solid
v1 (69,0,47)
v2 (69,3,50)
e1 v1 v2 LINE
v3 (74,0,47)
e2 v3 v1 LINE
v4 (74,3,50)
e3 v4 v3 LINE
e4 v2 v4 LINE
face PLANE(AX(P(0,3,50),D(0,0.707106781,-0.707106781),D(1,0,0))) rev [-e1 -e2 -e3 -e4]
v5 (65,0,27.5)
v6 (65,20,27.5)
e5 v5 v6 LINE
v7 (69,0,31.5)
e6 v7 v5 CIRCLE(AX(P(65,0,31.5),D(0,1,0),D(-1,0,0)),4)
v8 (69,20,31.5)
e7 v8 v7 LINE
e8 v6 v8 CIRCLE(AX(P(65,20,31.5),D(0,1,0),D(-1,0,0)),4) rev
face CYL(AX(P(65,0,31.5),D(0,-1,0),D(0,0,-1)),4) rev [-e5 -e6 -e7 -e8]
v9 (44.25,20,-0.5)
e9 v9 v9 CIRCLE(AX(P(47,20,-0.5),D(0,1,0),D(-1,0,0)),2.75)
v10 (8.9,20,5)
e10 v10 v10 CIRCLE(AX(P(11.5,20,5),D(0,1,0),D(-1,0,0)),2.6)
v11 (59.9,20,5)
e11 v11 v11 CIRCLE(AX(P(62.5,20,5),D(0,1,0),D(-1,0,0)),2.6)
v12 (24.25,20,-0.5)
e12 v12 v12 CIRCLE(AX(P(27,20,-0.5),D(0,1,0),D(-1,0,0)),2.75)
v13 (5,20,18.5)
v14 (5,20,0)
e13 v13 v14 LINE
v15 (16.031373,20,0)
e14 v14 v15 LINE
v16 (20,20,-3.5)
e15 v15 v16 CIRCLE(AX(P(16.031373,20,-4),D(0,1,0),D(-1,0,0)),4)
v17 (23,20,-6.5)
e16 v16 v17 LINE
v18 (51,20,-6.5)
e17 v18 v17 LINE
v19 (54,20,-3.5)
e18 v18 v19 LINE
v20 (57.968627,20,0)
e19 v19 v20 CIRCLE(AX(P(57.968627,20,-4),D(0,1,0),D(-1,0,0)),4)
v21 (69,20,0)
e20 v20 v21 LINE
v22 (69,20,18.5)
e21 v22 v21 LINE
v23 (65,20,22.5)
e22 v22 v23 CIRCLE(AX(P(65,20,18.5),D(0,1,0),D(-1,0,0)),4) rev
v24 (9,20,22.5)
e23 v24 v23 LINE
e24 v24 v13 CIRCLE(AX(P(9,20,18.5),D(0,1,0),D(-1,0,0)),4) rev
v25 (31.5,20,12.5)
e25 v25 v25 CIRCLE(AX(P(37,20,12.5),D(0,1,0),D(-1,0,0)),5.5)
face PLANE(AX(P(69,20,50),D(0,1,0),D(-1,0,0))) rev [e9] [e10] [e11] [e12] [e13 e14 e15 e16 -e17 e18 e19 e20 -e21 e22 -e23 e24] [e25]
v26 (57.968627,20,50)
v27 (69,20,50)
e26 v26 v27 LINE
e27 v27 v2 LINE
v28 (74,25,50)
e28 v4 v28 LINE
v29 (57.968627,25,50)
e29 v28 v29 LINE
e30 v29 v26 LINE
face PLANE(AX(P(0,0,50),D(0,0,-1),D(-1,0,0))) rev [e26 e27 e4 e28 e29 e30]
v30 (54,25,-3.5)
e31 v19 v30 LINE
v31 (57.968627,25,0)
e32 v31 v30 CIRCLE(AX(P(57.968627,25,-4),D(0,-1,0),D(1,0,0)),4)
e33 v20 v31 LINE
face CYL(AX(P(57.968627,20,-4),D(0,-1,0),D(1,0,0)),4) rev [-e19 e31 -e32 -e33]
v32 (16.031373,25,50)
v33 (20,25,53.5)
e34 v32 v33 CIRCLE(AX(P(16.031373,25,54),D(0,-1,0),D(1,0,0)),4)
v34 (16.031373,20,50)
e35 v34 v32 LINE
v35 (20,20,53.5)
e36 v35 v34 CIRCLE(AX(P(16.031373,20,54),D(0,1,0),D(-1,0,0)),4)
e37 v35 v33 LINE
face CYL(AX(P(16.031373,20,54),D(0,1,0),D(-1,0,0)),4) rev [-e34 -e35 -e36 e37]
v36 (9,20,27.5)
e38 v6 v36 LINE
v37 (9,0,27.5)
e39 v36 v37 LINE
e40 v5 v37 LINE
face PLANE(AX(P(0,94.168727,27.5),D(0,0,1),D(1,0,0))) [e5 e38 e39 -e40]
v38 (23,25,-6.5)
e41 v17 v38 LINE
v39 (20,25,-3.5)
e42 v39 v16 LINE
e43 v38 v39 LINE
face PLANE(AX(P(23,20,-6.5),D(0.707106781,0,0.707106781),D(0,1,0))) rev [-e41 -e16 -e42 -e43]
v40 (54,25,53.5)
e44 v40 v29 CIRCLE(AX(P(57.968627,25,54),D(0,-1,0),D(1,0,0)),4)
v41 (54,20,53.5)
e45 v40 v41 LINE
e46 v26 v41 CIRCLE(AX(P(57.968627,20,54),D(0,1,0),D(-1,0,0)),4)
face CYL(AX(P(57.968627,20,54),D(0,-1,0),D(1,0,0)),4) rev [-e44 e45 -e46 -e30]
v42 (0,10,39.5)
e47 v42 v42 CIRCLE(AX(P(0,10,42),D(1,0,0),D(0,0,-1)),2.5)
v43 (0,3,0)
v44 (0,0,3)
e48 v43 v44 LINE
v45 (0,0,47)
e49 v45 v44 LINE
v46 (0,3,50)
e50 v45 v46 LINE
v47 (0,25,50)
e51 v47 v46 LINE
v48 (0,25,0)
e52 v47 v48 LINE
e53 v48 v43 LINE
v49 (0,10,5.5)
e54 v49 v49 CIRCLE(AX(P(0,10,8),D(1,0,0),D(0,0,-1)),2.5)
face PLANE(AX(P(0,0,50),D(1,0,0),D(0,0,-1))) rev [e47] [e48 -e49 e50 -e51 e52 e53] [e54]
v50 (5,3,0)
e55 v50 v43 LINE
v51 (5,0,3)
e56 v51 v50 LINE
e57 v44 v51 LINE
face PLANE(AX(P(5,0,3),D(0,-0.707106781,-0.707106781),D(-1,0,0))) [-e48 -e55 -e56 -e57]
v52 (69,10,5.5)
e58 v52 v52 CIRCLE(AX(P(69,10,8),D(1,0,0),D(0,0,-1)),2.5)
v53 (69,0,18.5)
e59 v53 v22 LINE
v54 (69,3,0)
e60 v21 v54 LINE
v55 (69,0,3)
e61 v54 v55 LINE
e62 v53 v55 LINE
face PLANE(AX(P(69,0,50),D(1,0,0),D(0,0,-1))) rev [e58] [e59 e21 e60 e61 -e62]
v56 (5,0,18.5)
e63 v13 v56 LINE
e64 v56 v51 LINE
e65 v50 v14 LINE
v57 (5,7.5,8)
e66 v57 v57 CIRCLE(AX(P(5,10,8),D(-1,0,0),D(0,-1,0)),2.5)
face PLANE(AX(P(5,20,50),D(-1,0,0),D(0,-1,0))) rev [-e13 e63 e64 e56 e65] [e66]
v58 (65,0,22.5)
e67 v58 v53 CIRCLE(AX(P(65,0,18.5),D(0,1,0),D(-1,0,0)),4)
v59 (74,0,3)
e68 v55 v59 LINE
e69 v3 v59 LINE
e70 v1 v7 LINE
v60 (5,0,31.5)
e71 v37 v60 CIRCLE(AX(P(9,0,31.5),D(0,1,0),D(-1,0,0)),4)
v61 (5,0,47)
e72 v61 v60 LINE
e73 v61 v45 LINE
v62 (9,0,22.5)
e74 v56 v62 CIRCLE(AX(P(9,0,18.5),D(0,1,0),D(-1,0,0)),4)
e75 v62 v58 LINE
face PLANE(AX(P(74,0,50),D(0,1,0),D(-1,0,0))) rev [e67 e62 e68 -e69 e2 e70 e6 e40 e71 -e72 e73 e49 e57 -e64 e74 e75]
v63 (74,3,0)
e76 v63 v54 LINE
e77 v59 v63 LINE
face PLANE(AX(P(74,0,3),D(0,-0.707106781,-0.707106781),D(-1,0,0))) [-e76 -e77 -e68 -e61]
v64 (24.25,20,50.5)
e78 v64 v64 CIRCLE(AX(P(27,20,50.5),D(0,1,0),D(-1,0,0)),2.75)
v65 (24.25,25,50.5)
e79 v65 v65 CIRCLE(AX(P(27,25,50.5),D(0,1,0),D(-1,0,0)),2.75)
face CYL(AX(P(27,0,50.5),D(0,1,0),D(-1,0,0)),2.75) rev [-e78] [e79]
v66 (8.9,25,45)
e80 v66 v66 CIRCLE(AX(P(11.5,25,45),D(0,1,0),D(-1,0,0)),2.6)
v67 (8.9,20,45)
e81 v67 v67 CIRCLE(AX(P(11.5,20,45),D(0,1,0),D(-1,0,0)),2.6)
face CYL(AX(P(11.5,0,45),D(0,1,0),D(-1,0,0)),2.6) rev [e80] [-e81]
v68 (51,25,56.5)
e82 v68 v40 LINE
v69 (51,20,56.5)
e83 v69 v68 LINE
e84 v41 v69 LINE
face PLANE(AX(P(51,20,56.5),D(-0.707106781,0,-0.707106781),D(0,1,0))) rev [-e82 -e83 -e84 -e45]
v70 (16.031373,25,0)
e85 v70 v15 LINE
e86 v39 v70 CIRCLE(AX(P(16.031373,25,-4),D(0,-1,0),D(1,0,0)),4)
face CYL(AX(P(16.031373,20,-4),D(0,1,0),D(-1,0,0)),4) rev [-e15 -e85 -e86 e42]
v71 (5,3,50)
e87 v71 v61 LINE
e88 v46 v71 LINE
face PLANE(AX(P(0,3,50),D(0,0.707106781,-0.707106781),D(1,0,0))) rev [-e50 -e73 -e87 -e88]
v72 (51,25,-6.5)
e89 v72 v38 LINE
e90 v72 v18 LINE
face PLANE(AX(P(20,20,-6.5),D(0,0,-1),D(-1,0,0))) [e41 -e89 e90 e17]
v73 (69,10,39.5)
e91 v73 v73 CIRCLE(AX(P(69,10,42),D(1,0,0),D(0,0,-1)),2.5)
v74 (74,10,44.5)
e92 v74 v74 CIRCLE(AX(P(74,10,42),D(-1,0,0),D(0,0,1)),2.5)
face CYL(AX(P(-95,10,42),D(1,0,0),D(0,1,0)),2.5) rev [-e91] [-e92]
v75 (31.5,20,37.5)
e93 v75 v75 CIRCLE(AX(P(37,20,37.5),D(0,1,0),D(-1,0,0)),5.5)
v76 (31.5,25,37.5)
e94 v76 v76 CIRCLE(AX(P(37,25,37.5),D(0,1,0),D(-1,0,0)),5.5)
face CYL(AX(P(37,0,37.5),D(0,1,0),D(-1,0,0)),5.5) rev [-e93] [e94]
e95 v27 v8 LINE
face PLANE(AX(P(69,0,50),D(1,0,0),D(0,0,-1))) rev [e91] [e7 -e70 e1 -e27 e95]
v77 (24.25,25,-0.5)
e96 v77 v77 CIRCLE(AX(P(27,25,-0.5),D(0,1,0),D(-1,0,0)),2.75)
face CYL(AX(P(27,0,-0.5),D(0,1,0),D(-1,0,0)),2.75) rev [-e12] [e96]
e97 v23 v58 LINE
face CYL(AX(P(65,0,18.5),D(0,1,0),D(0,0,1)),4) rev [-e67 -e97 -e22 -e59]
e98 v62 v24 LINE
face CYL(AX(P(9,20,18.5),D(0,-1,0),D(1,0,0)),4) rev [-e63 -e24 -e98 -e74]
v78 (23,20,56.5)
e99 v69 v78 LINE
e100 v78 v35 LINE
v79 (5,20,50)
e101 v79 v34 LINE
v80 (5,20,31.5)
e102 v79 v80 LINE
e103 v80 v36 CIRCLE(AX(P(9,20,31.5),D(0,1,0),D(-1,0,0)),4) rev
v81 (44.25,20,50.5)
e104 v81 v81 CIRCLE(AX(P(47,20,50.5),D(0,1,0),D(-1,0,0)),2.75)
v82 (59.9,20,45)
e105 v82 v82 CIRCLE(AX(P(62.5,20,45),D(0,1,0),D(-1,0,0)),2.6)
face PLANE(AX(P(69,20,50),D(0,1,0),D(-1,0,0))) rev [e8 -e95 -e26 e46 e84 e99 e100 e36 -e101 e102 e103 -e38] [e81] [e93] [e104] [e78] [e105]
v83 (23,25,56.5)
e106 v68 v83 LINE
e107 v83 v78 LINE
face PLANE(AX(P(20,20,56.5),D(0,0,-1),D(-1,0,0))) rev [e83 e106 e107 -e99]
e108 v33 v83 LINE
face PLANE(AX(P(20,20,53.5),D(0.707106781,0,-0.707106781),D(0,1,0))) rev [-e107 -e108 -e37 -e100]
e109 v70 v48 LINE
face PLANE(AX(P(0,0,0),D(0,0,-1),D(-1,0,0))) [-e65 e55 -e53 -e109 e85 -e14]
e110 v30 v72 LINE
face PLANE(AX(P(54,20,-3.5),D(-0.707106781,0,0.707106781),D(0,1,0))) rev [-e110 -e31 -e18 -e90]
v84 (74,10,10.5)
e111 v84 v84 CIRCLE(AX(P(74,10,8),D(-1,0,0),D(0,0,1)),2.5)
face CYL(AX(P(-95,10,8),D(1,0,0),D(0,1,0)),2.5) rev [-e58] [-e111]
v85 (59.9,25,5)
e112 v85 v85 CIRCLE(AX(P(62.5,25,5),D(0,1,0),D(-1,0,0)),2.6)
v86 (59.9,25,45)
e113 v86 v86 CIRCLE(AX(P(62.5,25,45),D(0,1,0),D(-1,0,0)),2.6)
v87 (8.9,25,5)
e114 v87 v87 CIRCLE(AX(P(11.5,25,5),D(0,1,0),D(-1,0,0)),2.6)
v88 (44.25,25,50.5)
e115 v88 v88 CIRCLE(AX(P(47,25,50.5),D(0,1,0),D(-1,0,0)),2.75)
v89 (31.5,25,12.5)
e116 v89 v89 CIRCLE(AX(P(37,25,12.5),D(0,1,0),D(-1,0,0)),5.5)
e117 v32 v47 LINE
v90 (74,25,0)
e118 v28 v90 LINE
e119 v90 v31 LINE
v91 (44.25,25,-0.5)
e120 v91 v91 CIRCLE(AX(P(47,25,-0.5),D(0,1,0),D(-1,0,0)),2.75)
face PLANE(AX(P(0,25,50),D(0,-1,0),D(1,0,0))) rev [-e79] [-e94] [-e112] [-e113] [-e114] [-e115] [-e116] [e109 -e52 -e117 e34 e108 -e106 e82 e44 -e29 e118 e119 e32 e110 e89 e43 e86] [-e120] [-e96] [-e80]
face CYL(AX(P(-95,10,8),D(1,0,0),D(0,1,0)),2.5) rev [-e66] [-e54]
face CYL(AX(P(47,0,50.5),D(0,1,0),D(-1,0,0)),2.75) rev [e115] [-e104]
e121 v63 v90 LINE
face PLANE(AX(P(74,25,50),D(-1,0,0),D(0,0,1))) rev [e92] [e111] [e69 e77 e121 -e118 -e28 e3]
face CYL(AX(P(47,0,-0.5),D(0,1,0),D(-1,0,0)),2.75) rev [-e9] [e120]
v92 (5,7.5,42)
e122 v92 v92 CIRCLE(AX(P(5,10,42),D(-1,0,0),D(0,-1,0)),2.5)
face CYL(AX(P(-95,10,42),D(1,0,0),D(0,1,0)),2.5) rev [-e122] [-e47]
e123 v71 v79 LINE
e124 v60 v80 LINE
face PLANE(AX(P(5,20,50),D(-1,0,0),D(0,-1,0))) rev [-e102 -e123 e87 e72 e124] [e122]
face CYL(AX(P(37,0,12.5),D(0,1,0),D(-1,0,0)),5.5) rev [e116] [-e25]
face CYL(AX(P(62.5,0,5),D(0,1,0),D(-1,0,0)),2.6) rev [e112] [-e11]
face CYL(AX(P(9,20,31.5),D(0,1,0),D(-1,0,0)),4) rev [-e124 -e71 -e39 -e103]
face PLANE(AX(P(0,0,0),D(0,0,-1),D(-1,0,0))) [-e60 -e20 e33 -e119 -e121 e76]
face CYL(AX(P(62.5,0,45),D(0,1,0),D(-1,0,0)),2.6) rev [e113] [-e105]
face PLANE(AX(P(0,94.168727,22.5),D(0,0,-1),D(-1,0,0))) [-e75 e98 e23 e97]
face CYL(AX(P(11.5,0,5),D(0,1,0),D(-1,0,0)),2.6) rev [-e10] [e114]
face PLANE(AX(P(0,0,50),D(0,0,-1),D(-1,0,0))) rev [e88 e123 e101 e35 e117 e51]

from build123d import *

# Parameters (mm, degrees)
BOSS_EXTRUDE1_DEPTH = 50
SKETCH2_R           = 2.5
CUT_EXTRUDE1_DEPTH  = 100
CHAMFER1_SIZE       = 3
SKETCH3_R           = 2.6
CUT_EXTRUDE2_DEPTH  = 93.741576437
SKETCH6_R           = 5.5
CUT_EXTRUDE3_DEPTH  = 93.741576437
SKETCH7_W           = 74
SKETCH7_H           = 5
BOSS_EXTRUDE2_DEPTH = 20
FILLET1_R           = 4
SKETCH8_W           = 34
SKETCH8_H           = 6.5
BOSS_EXTRUDE3_DEPTH = 5
SKETCH9_R           = 2.75
CUT_EXTRUDE4_DEPTH  = 97.401504138
CHAMFER2_SIZE       = 3
FILLET2_R           = 4


with BuildPart() as part:
    # Sketch1 → Boss-Extrude1 (new body)
    with BuildSketch(Plane.XY):
        Polygon((0, 0), (0, 25), (74, 25), (74, 0), (69, 0), (69, 20), (5, 20), (5, 0), align=None)
    extrude(amount=BOSS_EXTRUDE1_DEPTH)

    # Sketch2 → Cut-Extrude1 (cut, symmetric)
    with BuildSketch(Plane(origin=(5, 0, 0), x_dir=(0, 0, -1), z_dir=(1, 0, 0))):
        with Locations((-42, 10)):
            Circle(SKETCH2_R)
        with Locations((-8, 10)):
            Circle(SKETCH2_R)
    extrude(amount=CUT_EXTRUDE1_DEPTH, both=True, mode=Mode.SUBTRACT)

    # Chamfer1
    chamfer1_edges = [part.edges().sort_by_distance(p)[0] for p in [
        (2.5, 0, 0),
        (71.5, 0, 50),
        (2.5, 0, 50),
        (71.5, 0, 0),
    ]]
    chamfer(chamfer1_edges, length=CHAMFER1_SIZE)

    # Sketch3 → Cut-Extrude2 (cut, through all)
    with BuildSketch(Plane(origin=(0, 25, 0), x_dir=(1, 0, 0), z_dir=(0, 1, 0))):
        with Locations(Location((11.5, -45, 0), (0, 0, 180))):
            Circle(SKETCH3_R)
        with Locations(Location((62.5, -45, 0), (0, 0, 180))):
            Circle(SKETCH3_R)
        with Locations(Location((62.5, -5, 0), (0, 0, 180))):
            Circle(SKETCH3_R)
        with Locations(Location((11.5, -5, 0), (0, 0, 180))):
            Circle(SKETCH3_R)
    extrude(amount=-CUT_EXTRUDE2_DEPTH, mode=Mode.SUBTRACT)

    # Sketch6 → Cut-Extrude3 (cut, through all)
    with BuildSketch(Plane(origin=(0, 25, 0), x_dir=(1, 0, 0), z_dir=(0, 1, 0))):
        with Locations(Location((37, -37.5, 0), (0, 0, 180))):
            Circle(SKETCH6_R)
        with Locations(Location((37, -12.5, 0), (0, 0, 180))):
            Circle(SKETCH6_R)
    extrude(amount=-CUT_EXTRUDE3_DEPTH, mode=Mode.SUBTRACT)

    # Sketch7 → Boss-Extrude2 (add)
    with BuildSketch(Plane.XZ):
        with Locations((37, 25)):
            Rectangle(SKETCH7_W, SKETCH7_H)
    extrude(amount=-BOSS_EXTRUDE2_DEPTH)

    # Fillet1
    fillet1_edges = [part.edges().sort_by_distance(p)[0] for p in [
        (5, 10, 22.5),
        (5, 10, 27.5),
        (69, 10, 22.5),
        (69, 10, 27.5),
    ]]
    fillet(fillet1_edges, radius=FILLET1_R)

    # Sketch8 → Boss-Extrude3 (add)
    with BuildSketch(Plane(origin=(0, 25, 0), x_dir=(1, 0, 0), z_dir=(0, 1, 0))):
        with Locations((37, 3.25)):
            Rectangle(SKETCH8_W, SKETCH8_H)
    boss_extrude3 = extrude(amount=-BOSS_EXTRUDE3_DEPTH)

    # Mirror1: Boss-Extrude3 across plane
    add(boss_extrude3.mirror(Plane.XY.offset(25)))

    # Sketch9 → Cut-Extrude4 (cut, through all)
    with BuildSketch(Plane(origin=(0, 25, 0), x_dir=(1, 0, 0), z_dir=(0, 1, 0))):
        with Locations(Location((27, 0.5, 0), (0, 0, 180))):
            Circle(SKETCH9_R)
        with Locations(Location((47, 0.5, 0), (0, 0, 180))):
            Circle(SKETCH9_R)
        with Locations(Location((27, -50.5, 0), (0, 0, 180))):
            Circle(SKETCH9_R)
        with Locations(Location((47, -50.5, 0), (0, 0, 180))):
            Circle(SKETCH9_R)
    extrude(amount=-CUT_EXTRUDE4_DEPTH, mode=Mode.SUBTRACT)

    # Chamfer2
    chamfer2_edges = [part.edges().sort_by_distance(p)[0] for p in [
        (20, 22.5, -6.5),
        (54, 22.5, -6.5),
        (20, 22.5, 56.5),
        (54, 22.5, 56.5),
    ]]
    chamfer(chamfer2_edges, length=CHAMFER2_SIZE)

    # Fillet2
    # the kernel refuses this fillet: 4 mm, written as the material it adds along each edge
    with BuildSketch(Plane(origin=(20, 25, 50), x_dir=(-1, 0, 0), z_dir=(0, -1, 0))) as fillet2_piece_1:
        with BuildLine():
            CenterArc((3.968626967, -4), FILLET2_R, 90, 82.819244219)
            Line((0, -3.5), (-0.079372539, -3.49))
            ThreePointArc((-0.079372539, -3.49), (-0.08, -1.75), (-0.08, 0))
            Line((-0.08, 0), (0, 0.08))
            Line((0, 0.08), (3.968626967, 0.08))
            Line((3.968626967, 0.08), (3.968626967, 0))
        make_face()
    extrude(amount=5)
    with BuildSketch(Plane(origin=(54, 25, 50), x_dir=(1, 0, 0), z_dir=(0, -1, 0))) as fillet2_piece_2:
        with BuildLine():
            CenterArc((3.968626967, 4), FILLET2_R, 187.180755781, 82.819244219)
            Line((0, 3.5), (-0.079372539, 3.49))
            ThreePointArc((-0.079372539, 3.49), (-0.08, 1.75), (-0.08, 0))
            Line((-0.08, 0), (0, -0.08))
            Line((0, -0.08), (3.968626967, -0.08))
            Line((3.968626967, -0.08), (3.968626967, 0))
        make_face()
    extrude(amount=5)
    with BuildSketch(Plane(origin=(54, 25, 0), x_dir=(0, 0, -1), z_dir=(0, -1, 0))) as fillet2_piece_3:
        with BuildLine():
            CenterArc((4, 3.968626967), FILLET2_R, 180, 82.819244219)
            Line((0, 3.968626967), (-0.08, 3.968626967))
            Line((-0.08, 3.968626967), (-0.08, 0))
            Line((-0.08, 0), (0, -0.08))
            ThreePointArc((0, -0.08), (1.75, -0.08), (3.49, -0.079372539))
            Line((3.49, -0.079372539), (3.5, 0))
        make_face()
    extrude(amount=5)
    with BuildSketch(Plane(origin=(20, 25, 0), x_dir=(0, 0, -1), z_dir=(0, -1, 0))) as fillet2_piece_4:
        with BuildLine():
            CenterArc((4, -3.968626967), FILLET2_R, 97.180755781, 82.819244219)
            Line((0, -3.968626967), (-0.08, -3.968626967))
            Line((-0.08, -3.968626967), (-0.08, 0))
            Line((-0.08, 0), (0, 0.08))
            ThreePointArc((0, 0.08), (1.75, 0.08), (3.49, 0.079372539))
            Line((3.49, 0.079372539), (3.5, 0))
        make_face()
    extrude(amount=5)


solid = part.part
